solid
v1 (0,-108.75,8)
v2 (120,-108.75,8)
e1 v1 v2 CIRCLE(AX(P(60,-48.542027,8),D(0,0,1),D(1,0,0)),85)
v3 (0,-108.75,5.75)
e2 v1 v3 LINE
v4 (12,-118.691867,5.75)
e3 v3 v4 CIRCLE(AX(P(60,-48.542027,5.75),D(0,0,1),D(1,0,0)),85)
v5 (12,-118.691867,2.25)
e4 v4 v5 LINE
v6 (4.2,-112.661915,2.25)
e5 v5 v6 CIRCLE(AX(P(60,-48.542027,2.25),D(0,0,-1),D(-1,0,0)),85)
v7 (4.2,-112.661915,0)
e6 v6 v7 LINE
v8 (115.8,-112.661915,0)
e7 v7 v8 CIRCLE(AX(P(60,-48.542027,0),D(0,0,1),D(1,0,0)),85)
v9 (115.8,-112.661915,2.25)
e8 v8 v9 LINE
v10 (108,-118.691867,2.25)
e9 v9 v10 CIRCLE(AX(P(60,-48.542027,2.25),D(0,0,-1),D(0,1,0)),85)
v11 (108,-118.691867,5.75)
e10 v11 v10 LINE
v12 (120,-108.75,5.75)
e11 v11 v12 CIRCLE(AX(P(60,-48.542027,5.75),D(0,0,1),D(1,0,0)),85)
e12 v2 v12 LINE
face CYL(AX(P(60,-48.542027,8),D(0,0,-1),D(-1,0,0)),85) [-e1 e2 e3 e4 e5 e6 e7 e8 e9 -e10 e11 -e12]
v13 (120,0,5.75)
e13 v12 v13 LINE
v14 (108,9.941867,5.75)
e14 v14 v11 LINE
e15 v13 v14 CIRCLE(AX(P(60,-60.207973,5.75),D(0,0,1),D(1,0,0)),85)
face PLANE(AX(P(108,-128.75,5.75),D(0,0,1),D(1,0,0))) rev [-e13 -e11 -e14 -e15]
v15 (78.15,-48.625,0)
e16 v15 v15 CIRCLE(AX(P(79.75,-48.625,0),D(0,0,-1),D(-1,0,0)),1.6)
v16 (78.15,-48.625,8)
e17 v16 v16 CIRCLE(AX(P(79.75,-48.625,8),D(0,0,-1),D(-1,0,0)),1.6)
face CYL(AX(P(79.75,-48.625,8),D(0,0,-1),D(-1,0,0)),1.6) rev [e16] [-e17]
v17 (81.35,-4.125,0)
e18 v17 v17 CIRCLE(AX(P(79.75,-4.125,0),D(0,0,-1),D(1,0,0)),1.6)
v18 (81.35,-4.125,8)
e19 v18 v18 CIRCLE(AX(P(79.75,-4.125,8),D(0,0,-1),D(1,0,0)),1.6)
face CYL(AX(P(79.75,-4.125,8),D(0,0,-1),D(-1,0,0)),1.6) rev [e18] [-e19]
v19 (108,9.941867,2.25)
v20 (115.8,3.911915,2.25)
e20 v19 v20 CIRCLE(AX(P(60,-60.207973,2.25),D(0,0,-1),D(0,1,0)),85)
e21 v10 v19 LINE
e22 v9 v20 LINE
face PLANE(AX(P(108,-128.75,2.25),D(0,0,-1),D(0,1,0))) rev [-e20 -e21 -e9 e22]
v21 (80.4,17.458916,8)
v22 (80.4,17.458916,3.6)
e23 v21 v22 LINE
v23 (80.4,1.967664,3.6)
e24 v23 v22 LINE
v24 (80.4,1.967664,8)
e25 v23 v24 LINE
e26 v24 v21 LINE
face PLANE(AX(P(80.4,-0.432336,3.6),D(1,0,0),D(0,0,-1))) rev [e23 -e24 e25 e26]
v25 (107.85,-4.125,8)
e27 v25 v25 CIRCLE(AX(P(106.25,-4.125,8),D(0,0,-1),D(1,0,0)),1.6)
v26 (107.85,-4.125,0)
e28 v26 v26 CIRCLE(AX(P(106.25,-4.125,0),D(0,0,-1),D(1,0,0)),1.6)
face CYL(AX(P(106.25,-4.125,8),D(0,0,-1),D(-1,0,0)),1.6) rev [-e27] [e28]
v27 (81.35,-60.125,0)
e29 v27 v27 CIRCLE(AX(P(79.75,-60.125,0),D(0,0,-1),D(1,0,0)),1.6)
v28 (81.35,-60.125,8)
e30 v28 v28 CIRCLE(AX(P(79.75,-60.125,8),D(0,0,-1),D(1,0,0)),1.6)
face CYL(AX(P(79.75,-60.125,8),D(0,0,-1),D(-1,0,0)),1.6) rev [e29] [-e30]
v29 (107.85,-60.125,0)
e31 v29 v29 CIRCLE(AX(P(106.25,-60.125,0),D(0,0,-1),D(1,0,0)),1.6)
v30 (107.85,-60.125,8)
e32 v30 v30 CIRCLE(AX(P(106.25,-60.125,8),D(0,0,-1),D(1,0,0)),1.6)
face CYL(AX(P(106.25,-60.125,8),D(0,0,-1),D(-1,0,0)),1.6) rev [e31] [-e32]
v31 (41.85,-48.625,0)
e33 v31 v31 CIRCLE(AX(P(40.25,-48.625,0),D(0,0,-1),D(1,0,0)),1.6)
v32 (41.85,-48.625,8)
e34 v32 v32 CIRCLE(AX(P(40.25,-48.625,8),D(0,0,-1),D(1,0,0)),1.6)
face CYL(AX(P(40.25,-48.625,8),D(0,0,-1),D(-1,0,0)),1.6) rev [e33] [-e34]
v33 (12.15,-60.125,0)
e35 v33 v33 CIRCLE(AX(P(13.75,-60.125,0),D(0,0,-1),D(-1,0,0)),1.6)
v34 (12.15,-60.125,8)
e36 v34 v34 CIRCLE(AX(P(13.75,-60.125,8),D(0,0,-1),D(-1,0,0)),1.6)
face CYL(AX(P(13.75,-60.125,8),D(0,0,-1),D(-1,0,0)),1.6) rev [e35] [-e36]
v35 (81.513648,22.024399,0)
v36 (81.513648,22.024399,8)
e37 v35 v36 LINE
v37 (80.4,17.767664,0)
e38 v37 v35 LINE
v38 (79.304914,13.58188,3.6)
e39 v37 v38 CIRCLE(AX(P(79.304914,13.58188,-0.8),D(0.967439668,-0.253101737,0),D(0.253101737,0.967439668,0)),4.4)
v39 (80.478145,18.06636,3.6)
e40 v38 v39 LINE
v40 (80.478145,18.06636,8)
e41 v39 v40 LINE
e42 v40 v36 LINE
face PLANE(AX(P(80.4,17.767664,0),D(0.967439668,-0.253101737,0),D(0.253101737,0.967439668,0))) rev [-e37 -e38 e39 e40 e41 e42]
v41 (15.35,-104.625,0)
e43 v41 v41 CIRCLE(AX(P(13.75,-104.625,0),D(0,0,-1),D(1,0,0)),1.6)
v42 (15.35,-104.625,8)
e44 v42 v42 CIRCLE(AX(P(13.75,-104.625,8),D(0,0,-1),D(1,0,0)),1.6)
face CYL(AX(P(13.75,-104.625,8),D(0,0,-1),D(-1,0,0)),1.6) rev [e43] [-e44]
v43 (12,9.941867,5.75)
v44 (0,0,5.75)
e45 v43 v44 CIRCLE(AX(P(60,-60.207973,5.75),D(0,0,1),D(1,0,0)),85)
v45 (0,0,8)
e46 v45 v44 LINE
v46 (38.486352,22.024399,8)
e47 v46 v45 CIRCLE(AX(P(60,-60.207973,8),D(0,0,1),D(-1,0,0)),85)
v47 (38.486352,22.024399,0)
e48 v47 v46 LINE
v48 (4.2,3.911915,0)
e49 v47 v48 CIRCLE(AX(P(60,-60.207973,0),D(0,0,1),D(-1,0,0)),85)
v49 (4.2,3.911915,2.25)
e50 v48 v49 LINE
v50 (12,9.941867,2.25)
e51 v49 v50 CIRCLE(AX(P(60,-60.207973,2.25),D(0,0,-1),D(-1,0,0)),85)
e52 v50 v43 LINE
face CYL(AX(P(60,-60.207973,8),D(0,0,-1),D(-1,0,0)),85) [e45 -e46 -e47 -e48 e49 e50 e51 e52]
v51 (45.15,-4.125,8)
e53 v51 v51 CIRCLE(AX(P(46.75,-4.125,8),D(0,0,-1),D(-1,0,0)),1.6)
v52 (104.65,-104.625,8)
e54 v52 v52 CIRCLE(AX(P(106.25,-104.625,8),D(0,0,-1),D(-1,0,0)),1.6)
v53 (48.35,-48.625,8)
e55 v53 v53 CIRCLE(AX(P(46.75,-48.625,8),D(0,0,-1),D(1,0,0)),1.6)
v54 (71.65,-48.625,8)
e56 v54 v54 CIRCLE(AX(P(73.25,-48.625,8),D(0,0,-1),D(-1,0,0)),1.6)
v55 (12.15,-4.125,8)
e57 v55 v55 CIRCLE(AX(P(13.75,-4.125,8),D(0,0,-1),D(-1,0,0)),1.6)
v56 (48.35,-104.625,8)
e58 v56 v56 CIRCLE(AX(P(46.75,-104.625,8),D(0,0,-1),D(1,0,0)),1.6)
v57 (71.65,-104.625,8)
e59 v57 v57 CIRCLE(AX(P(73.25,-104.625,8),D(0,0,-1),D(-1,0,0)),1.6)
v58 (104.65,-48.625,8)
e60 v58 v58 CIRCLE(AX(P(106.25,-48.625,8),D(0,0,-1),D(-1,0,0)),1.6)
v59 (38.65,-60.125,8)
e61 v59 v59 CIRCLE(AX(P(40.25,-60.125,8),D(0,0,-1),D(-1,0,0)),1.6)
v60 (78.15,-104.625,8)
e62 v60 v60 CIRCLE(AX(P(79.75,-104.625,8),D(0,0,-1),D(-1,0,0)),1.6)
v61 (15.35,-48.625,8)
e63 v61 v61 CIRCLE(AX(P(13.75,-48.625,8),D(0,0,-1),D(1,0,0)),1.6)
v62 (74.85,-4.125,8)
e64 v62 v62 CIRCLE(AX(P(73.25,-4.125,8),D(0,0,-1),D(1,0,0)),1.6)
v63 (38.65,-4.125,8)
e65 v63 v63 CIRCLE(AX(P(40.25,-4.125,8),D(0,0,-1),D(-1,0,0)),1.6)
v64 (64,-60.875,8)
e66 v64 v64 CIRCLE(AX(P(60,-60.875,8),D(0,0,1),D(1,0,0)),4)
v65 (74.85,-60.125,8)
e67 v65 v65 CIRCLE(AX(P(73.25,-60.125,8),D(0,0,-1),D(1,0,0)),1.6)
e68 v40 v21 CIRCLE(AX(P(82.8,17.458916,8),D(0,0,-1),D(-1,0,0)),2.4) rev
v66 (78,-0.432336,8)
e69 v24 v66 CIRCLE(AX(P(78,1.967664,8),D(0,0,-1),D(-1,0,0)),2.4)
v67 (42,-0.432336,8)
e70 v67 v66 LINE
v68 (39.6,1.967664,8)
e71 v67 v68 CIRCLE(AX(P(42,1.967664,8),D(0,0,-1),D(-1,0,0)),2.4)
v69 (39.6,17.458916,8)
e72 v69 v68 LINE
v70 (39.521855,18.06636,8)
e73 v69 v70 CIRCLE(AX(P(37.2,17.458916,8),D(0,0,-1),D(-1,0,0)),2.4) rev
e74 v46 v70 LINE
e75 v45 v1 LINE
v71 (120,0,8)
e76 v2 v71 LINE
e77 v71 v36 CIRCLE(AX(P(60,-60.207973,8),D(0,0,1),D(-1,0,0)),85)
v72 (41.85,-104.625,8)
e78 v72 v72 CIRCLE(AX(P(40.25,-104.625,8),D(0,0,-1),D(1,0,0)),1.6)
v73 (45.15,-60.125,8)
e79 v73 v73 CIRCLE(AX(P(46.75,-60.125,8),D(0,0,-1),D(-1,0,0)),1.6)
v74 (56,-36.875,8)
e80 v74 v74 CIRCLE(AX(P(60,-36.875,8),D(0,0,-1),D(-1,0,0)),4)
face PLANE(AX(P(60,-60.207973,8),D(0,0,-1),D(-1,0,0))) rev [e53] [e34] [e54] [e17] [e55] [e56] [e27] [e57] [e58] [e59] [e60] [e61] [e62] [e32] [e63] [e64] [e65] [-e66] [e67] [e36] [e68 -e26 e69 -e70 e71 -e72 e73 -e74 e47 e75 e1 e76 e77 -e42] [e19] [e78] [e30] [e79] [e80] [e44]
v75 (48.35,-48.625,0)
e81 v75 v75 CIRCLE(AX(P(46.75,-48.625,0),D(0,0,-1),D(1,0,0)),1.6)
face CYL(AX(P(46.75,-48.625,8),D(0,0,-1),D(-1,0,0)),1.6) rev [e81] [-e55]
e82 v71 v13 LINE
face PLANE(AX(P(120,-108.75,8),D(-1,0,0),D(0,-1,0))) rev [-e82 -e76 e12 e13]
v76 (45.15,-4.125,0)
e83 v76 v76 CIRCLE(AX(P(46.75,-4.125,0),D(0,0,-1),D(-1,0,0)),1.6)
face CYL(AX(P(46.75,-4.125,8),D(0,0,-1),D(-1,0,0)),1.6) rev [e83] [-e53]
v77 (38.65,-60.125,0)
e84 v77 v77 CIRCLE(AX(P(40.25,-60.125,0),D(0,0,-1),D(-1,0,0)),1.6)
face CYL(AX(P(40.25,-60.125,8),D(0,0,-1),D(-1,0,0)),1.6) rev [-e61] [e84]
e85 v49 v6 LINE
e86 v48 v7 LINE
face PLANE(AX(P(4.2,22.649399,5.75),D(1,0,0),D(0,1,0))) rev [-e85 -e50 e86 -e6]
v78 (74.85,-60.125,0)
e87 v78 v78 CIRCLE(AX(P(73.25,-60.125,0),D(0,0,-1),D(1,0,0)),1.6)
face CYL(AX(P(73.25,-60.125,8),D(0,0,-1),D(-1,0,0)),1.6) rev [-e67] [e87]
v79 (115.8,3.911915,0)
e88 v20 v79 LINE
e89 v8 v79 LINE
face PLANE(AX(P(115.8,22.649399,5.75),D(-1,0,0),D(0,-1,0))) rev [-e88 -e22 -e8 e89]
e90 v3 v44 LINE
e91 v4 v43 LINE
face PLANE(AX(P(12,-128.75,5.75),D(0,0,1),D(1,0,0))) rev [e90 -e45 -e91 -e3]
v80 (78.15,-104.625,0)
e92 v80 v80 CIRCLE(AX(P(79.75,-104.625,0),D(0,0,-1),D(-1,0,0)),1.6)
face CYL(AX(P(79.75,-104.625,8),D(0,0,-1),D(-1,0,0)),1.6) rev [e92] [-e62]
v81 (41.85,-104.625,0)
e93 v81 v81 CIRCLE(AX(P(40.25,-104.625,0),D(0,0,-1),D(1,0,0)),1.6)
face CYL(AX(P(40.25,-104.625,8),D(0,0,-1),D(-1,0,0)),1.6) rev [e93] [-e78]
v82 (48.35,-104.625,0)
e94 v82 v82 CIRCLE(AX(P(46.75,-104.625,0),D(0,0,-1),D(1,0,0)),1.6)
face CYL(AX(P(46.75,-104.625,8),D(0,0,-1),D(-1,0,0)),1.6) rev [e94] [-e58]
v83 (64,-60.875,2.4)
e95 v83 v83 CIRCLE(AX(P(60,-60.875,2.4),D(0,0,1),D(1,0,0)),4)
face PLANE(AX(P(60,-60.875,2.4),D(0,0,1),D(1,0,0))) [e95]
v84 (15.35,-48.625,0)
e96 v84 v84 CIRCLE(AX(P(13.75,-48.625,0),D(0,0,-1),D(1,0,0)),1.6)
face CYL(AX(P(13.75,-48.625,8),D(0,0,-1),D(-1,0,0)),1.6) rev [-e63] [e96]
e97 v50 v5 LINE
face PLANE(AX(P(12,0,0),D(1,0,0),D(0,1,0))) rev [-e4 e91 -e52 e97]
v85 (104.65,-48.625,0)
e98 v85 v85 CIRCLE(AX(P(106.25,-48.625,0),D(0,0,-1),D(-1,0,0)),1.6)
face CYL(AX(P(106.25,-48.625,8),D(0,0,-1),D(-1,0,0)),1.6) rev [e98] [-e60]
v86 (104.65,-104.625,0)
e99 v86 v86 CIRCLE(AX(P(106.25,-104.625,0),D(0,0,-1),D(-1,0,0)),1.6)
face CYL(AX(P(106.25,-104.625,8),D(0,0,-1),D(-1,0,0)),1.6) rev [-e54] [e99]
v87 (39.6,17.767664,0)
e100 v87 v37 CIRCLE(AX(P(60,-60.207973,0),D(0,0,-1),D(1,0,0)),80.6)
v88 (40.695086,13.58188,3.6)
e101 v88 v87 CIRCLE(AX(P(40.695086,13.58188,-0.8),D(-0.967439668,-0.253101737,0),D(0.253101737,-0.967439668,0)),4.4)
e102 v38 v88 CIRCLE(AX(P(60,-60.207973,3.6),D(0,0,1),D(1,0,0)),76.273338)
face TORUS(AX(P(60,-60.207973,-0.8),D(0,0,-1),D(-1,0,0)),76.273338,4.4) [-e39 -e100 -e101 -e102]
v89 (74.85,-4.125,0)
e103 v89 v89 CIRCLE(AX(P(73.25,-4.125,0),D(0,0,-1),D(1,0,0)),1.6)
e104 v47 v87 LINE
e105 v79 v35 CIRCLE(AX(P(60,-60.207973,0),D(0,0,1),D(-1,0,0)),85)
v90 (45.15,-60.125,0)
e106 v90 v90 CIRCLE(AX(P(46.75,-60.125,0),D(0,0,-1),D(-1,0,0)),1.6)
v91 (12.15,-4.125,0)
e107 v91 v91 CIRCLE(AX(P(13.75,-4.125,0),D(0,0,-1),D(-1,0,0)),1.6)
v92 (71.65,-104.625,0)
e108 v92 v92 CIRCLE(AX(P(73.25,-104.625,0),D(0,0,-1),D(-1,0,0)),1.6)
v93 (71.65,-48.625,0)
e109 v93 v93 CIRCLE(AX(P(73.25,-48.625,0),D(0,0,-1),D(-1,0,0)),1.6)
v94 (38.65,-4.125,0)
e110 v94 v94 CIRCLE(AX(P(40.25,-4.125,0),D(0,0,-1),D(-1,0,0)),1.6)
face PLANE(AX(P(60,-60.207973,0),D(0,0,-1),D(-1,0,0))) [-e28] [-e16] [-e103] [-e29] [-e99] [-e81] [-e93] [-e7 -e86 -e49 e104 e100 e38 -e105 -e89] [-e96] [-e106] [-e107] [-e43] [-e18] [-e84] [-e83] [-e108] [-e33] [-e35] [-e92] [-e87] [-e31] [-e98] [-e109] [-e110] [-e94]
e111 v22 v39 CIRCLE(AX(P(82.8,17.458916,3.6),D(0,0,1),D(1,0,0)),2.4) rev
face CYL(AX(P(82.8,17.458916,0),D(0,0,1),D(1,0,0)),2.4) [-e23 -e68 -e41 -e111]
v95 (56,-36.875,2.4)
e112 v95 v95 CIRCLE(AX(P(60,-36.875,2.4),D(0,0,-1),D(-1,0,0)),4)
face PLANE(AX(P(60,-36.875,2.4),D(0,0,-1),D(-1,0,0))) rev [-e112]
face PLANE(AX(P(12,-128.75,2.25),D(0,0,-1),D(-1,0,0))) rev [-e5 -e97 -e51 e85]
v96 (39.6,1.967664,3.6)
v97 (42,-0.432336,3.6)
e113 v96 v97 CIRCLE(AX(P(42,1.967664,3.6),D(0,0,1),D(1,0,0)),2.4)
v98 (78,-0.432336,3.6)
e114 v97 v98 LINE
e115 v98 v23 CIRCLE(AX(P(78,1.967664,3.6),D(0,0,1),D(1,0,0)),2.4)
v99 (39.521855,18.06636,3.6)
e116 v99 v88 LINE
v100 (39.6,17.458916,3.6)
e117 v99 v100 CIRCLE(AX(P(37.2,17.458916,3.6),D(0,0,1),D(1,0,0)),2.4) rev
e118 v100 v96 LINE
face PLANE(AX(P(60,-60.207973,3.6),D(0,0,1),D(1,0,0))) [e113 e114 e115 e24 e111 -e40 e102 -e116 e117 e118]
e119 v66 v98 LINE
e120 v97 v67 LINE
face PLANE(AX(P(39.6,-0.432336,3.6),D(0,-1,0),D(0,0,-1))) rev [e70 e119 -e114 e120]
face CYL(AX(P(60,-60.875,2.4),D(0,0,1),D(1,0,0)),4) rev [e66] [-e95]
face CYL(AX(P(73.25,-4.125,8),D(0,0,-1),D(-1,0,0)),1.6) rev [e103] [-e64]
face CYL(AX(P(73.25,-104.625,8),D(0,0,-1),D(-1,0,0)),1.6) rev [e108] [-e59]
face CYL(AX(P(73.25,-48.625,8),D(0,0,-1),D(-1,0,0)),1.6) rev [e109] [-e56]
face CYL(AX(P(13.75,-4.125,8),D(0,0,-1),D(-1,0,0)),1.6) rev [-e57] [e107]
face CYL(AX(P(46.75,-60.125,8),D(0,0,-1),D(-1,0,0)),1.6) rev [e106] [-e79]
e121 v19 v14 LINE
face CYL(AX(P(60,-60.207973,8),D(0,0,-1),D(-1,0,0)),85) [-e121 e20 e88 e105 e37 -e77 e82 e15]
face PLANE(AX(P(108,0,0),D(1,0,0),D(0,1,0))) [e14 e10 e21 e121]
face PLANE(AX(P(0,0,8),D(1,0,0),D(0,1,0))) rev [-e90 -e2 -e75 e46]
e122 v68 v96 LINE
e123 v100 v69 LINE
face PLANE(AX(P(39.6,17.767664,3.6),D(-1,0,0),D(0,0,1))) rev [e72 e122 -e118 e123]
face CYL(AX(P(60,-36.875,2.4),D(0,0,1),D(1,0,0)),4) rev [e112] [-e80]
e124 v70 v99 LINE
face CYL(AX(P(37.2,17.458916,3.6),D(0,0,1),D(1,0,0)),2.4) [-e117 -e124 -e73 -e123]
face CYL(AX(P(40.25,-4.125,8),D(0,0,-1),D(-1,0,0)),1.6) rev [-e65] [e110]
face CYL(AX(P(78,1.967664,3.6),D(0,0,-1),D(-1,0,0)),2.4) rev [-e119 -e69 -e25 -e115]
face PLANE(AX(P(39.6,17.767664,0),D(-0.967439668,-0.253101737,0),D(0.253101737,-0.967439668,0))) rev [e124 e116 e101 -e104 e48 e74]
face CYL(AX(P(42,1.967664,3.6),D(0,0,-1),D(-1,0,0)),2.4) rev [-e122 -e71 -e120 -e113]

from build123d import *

# Parameters (mm, degrees)
RESSALTO_EXTRUS_O1_DEPTH = 8
ESBO_O5_R                = 4
CORTE_EXTRUS_O3_DEPTH    = 5.6
ESBO_O7_R                = 1.6
CORTE_EXTRUS_O4_DEPTH    = 180.714977127
CORTE_EXTRUS_O6_DEPTH    = 180.714977127
CORTE_EXTRUS_O7_DEPTH    = 4.4
FILETE1_R                = 2.4
FILETE2_R                = 4.4
ESBO_O11_W               = 3.5
ESBO_O11_H               = 150
CORTE_EXTRUS_O8_DEPTH    = 12
ESBO_O12_W               = 3.5
ESBO_O12_H               = 150
CORTE_EXTRUS_O9_DEPTH    = 12
ESBO_O13_W               = 4.4
ESBO_O13_H               = 156.816425971
CORTE_EXTRUS_O10_DEPTH   = 5.75


with BuildPart() as part:
    # Esboço1 → Ressalto-extrusão1 (new body)
    with BuildSketch(Plane.XY):
        with BuildLine():
            Line((0, 0), (0, -108.75))
            ThreePointArc((0, -108.75), (60, -133.542027106), (120, -108.75))
            Line((120, -108.75), (120, 0))
            ThreePointArc((120, 0), (60, 24.792027106), (0, 0))
        make_face()
    extrude(amount=RESSALTO_EXTRUS_O1_DEPTH)

    # Esboço5 → Corte-extrusão3 (cut)
    with BuildSketch(Plane.XY.offset(8)):
        with Locations((60, -60.875)):
            Circle(ESBO_O5_R)
        with Locations(Location((60, -36.875, 0), (0, 0, 180))):
            Circle(ESBO_O5_R)
    extrude(amount=-CORTE_EXTRUS_O3_DEPTH, mode=Mode.SUBTRACT)

    # Esboço7 → Corte-extrusão4 (cut, through all)
    with BuildSketch(Plane(origin=(0, 0, 0), x_dir=(-1, 0, 0), z_dir=(0, 0, -1))):
        with Locations((-73.25, -48.625)):
            Circle(ESBO_O7_R)
        with Locations((-79.75, -48.625)):
            Circle(ESBO_O7_R)
        with Locations((-106.25, -48.625)):
            Circle(ESBO_O7_R)
        with Locations(Location((-73.25, -4.125, 0), (0, 0, 180))):
            Circle(ESBO_O7_R)
        with Locations(Location((-106.25, -4.125, 0), (0, 0, 180))):
            Circle(ESBO_O7_R)
        with Locations(Location((-79.75, -4.125, 0), (0, 0, 180))):
            Circle(ESBO_O7_R)
        with Locations((-40.25, -4.125)):
            Circle(ESBO_O7_R)
        with Locations((-13.75, -4.125)):
            Circle(ESBO_O7_R)
        with Locations((-46.75, -4.125)):
            Circle(ESBO_O7_R)
        with Locations(Location((-13.75, -48.625, 0), (0, 0, 180))):
            Circle(ESBO_O7_R)
        with Locations(Location((-40.25, -48.625, 0), (0, 0, 180))):
            Circle(ESBO_O7_R)
        with Locations(Location((-46.75, -48.625, 0), (0, 0, 180))):
            Circle(ESBO_O7_R)
        with Locations((-46.75, -60.125)):
            Circle(ESBO_O7_R)
        with Locations((-40.25, -60.125)):
            Circle(ESBO_O7_R)
        with Locations((-13.75, -60.125)):
            Circle(ESBO_O7_R)
        with Locations(Location((-46.75, -104.625, 0), (0, 0, 180))):
            Circle(ESBO_O7_R)
        with Locations(Location((-13.75, -104.625, 0), (0, 0, 180))):
            Circle(ESBO_O7_R)
        with Locations(Location((-40.25, -104.625, 0), (0, 0, 180))):
            Circle(ESBO_O7_R)
        with Locations((-79.75, -104.625)):
            Circle(ESBO_O7_R)
        with Locations((-106.25, -104.625)):
            Circle(ESBO_O7_R)
        with Locations((-73.25, -104.625)):
            Circle(ESBO_O7_R)
        with Locations(Location((-106.25, -60.125, 0), (0, 0, 180))):
            Circle(ESBO_O7_R)
        with Locations(Location((-79.75, -60.125, 0), (0, 0, 180))):
            Circle(ESBO_O7_R)
        with Locations(Location((-73.25, -60.125, 0), (0, 0, 180))):
            Circle(ESBO_O7_R)
    extrude(amount=-CORTE_EXTRUS_O4_DEPTH, mode=Mode.SUBTRACT)

    # Esboço9 → Corte-extrusão6 (cut, through all)
    with BuildSketch(Plane.XY.offset(8)):
        with BuildLine():
            Line((39.6, 17.767664327), (38.486352357, 22.024398865))
            ThreePointArc((38.486352357, 22.024398865), (60, 24.792027106), (81.513647643, 22.024398865))
            Line((81.513647643, 22.024398865), (80.4, 17.767664327))
            ThreePointArc((80.4, 17.767664327), (60, 20.392027106), (39.6, 17.767664327))
        make_face()
    extrude(amount=-CORTE_EXTRUS_O6_DEPTH, mode=Mode.SUBTRACT)

    # Esboço10 → Corte-extrusão7 (cut)
    with BuildSketch(Plane.XY.offset(8)):
        with BuildLine():
            Line((39.6, 17.767664327), (39.6, -0.432335673))
            Line((39.6, -0.432335673), (80.4, -0.432335673))
            Line((80.4, -0.432335673), (80.4, 17.767664327))
            ThreePointArc((80.4, 17.767664327), (60, 20.392027106), (39.6, 17.767664327))
        make_face()
    extrude(amount=-CORTE_EXTRUS_O7_DEPTH, mode=Mode.SUBTRACT)

    # Filete1
    filete1_edges = [part.edges().sort_by_distance(p)[0] for p in [
        (80.4, -0.432335673, 5.8),
        (39.6, -0.432335673, 5.8),
        (39.6, 17.767664327, 5.8),
        (80.4, 17.767664327, 5.8),
    ]]
    fillet(filete1_edges, radius=FILETE1_R)

    # Filete2
    # the kernel refuses this fillet: 4.4 mm, written as the material it takes off along each edge
    with BuildSketch(Plane(origin=(60, -60.207972894, 3.6), x_dir=(0.25310173697270616, 0.9674396677526714, 0), z_dir=(0.9674396677526714, -0.25310173697270616, 0))) as filete2_piece_1:
        with BuildLine():
            CenterArc((76.273338469, -4.4), FILETE2_R, 10.475681696, 79.524318304)
            Line((80.6, -3.6), (80.6, 0))
            Line((80.6, 0), (76.273338469, 0))
        make_face()
    revolve(axis=Axis((60, -60.207972894, 3.6), (0, 0, 1)), revolution_arc=29.322266437, mode=Mode.SUBTRACT)

    # Esboço11 → Corte-extrusão8 (cut)
    with BuildSketch(Plane.ZY):
        with Locations((4, -53.75)):
            Rectangle(ESBO_O11_W, ESBO_O11_H)
    extrude(amount=-CORTE_EXTRUS_O8_DEPTH, mode=Mode.SUBTRACT)

    # Esboço12 → Corte-extrusão9 (cut)
    with BuildSketch(Plane(origin=(120, 0, 0), x_dir=(0, 0, -1), z_dir=(1, 0, 0))):
        with Locations((-4, -53.75)):
            Rectangle(ESBO_O12_W, ESBO_O12_H)
    extrude(amount=-CORTE_EXTRUS_O9_DEPTH, mode=Mode.SUBTRACT)

    # Esboço13 → Corte-extrusão10 (cut)
    with BuildSketch(Plane(origin=(0, 0, 0), x_dir=(-1, 0, 0), z_dir=(0, 0, -1))):
        with Locations((-118, -55.758814121)):
            Rectangle(ESBO_O13_W, ESBO_O13_H)
        with Locations((-2, -55.758814121)):
            Rectangle(ESBO_O13_W, ESBO_O13_H)
    extrude(amount=-CORTE_EXTRUS_O10_DEPTH, mode=Mode.SUBTRACT)


solid = part.part
